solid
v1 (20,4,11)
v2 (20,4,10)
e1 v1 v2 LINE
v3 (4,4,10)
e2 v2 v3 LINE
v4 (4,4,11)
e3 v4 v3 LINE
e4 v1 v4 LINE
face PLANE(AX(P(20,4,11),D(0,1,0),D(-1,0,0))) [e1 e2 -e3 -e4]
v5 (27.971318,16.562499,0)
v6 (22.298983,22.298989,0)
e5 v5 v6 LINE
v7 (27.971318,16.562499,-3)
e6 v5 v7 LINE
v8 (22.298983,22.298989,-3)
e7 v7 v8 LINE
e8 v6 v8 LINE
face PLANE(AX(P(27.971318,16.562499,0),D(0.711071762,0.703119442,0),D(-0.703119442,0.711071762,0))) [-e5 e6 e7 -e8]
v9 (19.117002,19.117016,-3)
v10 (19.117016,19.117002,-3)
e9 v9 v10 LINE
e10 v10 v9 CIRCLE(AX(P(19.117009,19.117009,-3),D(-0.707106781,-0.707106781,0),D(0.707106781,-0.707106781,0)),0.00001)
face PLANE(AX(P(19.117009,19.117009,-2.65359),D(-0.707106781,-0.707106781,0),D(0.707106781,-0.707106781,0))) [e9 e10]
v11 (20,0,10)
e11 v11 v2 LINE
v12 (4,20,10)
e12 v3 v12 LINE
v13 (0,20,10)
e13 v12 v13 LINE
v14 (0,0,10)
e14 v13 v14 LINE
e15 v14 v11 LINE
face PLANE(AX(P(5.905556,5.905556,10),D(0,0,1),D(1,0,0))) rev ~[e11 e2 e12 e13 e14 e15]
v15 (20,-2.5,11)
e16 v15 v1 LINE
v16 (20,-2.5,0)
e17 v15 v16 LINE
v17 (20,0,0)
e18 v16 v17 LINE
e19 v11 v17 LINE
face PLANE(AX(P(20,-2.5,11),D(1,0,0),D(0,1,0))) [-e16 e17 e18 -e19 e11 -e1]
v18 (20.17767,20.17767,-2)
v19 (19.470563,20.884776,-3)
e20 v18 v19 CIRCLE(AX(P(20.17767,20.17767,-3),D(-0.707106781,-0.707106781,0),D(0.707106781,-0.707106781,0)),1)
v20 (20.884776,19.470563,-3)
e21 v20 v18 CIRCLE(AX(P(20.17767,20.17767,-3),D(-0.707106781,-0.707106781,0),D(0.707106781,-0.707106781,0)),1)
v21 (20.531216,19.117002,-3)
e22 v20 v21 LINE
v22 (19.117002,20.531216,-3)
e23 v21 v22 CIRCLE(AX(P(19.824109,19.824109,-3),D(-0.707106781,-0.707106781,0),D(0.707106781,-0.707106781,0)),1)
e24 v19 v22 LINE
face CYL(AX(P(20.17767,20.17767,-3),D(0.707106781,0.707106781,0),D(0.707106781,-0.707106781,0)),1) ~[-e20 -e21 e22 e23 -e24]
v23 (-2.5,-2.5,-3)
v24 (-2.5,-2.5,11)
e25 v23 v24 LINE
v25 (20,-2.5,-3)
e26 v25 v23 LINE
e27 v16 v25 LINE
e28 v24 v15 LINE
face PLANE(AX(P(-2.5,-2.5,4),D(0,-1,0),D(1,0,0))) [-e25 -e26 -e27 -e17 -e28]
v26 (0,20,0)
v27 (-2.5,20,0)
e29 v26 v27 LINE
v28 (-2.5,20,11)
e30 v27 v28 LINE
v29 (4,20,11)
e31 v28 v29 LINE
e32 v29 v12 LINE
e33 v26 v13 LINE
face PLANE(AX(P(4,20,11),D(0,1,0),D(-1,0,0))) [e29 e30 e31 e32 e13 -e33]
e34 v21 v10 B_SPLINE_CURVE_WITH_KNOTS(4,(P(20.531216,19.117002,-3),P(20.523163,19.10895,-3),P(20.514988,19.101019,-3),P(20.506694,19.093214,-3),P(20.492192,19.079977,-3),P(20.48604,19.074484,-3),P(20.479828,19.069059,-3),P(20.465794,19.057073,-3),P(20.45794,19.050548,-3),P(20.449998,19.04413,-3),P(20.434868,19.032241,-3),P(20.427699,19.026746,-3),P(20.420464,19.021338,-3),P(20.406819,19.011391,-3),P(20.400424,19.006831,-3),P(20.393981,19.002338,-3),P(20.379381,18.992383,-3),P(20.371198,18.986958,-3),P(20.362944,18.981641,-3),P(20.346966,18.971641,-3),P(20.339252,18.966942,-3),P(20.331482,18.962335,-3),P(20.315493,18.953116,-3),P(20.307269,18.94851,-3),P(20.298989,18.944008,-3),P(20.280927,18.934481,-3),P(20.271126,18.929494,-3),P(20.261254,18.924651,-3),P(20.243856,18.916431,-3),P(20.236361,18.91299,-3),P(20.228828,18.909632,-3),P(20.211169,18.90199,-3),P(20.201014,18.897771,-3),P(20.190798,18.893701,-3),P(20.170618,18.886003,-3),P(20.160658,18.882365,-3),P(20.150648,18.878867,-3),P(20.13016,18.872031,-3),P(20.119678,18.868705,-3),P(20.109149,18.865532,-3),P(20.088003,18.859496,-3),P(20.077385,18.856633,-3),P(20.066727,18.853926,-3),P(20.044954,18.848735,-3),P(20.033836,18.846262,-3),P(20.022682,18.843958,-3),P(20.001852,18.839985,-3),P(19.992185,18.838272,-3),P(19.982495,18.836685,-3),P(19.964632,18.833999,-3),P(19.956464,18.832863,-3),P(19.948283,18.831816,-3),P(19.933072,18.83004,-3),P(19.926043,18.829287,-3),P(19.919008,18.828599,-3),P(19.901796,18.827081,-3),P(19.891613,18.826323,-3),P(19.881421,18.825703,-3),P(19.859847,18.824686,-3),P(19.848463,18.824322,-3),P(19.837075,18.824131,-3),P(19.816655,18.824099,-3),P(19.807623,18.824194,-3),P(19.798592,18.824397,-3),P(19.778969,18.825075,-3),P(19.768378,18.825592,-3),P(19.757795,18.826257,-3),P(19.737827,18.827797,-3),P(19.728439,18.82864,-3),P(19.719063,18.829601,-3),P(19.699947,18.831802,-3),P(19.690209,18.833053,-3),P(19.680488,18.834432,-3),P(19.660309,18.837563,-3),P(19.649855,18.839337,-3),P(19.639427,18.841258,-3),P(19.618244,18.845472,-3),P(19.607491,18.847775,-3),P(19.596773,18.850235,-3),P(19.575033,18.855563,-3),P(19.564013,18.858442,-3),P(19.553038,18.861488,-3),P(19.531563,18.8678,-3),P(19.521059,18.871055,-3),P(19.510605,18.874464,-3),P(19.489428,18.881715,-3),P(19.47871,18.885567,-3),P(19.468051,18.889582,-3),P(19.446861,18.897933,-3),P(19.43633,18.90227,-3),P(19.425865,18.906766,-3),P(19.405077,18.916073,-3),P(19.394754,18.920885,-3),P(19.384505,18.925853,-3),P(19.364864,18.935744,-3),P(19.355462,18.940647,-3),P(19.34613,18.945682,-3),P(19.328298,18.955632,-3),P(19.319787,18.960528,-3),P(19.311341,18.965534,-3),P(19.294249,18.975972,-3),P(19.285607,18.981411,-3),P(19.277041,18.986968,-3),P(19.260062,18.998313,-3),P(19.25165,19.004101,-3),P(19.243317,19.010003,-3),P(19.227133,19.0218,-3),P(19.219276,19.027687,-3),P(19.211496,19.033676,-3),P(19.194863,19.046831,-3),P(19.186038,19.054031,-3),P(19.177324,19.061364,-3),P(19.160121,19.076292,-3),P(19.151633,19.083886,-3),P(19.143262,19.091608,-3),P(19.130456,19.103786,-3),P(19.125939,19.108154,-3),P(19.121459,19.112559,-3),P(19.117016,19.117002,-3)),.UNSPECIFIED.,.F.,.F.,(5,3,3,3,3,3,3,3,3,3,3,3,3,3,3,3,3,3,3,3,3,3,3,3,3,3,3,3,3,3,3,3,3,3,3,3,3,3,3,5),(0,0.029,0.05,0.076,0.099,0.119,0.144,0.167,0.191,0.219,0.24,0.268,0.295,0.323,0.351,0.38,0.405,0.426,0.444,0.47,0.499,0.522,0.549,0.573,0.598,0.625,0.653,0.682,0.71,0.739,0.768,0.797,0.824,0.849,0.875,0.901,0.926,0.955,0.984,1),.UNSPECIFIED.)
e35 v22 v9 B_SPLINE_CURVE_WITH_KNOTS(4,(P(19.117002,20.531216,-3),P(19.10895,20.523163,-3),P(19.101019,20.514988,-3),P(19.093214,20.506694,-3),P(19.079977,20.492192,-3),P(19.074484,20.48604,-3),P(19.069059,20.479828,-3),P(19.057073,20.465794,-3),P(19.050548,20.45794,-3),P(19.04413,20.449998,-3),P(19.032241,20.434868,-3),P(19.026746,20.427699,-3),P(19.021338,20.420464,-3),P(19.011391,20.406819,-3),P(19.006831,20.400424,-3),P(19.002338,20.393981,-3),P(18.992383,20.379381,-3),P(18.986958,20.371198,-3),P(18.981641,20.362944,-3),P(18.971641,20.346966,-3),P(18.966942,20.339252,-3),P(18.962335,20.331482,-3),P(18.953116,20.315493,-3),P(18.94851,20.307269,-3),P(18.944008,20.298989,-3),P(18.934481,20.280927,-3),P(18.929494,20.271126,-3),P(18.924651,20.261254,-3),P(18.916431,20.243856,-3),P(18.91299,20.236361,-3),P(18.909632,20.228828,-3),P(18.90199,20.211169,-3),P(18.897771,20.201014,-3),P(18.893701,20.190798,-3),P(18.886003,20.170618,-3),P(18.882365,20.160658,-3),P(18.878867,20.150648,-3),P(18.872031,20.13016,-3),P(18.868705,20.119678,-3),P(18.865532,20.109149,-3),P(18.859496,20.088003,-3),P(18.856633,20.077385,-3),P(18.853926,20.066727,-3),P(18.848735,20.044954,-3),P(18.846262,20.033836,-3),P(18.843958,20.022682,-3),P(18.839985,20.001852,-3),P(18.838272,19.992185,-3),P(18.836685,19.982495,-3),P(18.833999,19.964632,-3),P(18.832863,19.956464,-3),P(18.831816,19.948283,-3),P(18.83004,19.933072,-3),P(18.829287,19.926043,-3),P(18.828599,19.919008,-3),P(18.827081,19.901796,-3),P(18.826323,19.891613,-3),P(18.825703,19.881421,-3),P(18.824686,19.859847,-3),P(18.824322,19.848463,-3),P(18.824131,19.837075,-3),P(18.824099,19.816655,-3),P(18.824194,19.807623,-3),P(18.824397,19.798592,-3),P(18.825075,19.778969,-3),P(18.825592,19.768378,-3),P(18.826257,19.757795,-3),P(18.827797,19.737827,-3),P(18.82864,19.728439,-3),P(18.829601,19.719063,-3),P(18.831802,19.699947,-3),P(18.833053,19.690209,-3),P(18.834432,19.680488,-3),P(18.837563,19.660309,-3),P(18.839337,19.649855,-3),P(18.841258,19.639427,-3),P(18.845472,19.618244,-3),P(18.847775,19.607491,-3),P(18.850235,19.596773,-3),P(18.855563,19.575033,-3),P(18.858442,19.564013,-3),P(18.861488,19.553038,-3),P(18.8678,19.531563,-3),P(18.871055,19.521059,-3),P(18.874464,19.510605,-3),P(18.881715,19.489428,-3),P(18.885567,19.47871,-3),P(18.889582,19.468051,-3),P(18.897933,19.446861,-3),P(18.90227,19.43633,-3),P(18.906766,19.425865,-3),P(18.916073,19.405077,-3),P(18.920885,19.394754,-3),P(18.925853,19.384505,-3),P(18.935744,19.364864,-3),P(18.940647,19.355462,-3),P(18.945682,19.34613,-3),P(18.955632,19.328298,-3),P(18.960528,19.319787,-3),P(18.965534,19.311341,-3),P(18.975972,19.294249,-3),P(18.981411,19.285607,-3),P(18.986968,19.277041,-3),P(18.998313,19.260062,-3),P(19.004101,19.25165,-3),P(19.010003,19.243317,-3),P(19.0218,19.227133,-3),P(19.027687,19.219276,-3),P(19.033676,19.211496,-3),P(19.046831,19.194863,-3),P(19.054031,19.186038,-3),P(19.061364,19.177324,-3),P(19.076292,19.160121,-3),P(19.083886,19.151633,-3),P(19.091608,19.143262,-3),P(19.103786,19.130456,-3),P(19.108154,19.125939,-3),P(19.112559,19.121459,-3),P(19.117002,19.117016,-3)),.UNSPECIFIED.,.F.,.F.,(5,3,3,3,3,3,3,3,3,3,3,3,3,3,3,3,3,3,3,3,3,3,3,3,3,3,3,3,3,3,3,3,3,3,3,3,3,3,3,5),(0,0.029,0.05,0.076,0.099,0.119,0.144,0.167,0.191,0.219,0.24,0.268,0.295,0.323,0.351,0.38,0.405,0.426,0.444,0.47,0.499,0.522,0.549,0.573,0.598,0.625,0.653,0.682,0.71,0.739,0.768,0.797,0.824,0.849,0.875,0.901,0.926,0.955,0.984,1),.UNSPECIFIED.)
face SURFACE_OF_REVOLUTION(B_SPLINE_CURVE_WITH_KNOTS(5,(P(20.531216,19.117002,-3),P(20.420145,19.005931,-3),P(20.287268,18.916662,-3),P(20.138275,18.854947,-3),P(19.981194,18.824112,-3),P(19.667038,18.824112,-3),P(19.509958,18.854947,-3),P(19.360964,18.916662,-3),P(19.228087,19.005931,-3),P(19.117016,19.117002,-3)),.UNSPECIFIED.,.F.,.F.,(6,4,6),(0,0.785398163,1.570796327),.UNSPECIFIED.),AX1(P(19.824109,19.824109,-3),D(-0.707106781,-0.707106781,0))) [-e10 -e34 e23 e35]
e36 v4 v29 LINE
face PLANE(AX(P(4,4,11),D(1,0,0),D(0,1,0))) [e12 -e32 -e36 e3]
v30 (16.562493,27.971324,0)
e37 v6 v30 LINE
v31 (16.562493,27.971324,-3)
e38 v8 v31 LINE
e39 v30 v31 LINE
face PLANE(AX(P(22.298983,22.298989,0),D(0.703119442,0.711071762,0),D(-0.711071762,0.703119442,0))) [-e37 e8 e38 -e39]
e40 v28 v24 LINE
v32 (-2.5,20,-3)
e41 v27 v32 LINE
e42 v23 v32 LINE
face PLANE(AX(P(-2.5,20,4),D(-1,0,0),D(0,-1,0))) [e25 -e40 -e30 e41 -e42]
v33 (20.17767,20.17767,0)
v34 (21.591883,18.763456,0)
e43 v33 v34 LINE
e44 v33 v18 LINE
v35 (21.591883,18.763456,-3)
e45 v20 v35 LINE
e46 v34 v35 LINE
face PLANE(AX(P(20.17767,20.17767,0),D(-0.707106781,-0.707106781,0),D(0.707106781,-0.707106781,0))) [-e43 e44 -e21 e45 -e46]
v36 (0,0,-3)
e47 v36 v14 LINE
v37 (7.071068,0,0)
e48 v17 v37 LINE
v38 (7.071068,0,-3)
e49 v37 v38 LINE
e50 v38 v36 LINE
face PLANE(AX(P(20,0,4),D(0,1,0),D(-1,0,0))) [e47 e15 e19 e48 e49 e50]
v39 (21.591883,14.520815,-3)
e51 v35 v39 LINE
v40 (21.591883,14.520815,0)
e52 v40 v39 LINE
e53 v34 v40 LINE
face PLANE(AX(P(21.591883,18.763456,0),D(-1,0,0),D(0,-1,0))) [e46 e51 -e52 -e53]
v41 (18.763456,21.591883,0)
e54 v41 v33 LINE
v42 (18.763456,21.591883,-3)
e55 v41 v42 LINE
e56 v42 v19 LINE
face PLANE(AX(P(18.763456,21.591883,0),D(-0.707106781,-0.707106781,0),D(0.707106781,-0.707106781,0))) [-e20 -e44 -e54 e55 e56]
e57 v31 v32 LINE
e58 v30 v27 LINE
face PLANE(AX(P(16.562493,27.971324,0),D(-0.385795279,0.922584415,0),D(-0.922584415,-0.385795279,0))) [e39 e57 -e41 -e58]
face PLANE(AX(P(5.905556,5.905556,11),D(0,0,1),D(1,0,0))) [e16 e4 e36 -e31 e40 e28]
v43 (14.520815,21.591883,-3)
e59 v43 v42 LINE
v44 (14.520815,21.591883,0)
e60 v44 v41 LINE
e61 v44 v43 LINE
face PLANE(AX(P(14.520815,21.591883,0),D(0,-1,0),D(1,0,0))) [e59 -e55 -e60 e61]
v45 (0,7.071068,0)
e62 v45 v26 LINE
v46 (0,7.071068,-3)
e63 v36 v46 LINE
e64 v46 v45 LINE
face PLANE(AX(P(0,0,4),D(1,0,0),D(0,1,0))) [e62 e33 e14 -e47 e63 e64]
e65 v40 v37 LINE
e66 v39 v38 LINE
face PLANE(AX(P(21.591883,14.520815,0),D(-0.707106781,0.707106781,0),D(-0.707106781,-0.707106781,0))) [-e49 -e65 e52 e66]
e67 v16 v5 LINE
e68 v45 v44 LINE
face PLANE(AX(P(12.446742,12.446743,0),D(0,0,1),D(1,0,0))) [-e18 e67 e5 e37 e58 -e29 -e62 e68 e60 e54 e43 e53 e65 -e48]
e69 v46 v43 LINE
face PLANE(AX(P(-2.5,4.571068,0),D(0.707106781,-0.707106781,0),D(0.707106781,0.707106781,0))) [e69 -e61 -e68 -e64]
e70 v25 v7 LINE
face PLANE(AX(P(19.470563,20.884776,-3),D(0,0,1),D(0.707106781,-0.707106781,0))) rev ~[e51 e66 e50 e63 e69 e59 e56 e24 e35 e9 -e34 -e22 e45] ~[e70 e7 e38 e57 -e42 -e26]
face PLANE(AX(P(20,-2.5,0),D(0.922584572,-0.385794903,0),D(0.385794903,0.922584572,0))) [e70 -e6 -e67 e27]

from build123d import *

# Parameters (mm, degrees)
F2_DEPTH  = 7
F4_DEPTH  = 3
F5_DEPTH  = 7
F7_DEPTH  = 1.5
F8_R      = 0.99999
F10_DEPTH = 1


# Not quite as in the source:
# - a fillet or chamfer is up to 0.001 mm smaller than in the source, because OpenCascade refuses the exact size


with BuildPart() as f2:
    # F1 (on offset) → F2 (new body)
    with BuildSketch(Plane.XY.offset(4)):
        Polygon((20, 0), (0, 0), (0, 20), (-2.5, 20), (-2.5, -2.5), (20, -2.5), align=None)
    extrude(amount=F2_DEPTH)



with BuildPart() as f4:
    # F3 (on Top) → F4 (new body)
    with BuildSketch(Plane.XY):
        Polygon((21.591883092, 18.7634559673), (21.591883092, 14.5208152802), (4.5710678119, -2.5), (8.75, -2.5), (20, -2.5), (27.9713179916, 16.5624991059), (22.2989825486, 22.2989889792), (16.5624926754, 27.9713244222), (-2.5, 20), (-2.5, 8.75), (-2.5, 4.5710678119), (14.5208152802, 21.591883092), (18.7634559673, 21.591883092), (20.1776695297, 20.1776695297), align=None)
    extrude(amount=-F4_DEPTH)


with BuildPart() as f2_1:
    add(f2.part)

    add(f4.part)  # F5 merges F4
    # F1 (on offset) → F5 (join)
    with BuildSketch(Plane.XY.offset(4)):
        Polygon((20, 0), (0, 0), (0, 20), (-2.5, 20), (-2.5, -2.5), (20, -2.5), align=None)
    extrude(amount=-F5_DEPTH)

    # F6 (on face) → F7 (join)
    with BuildSketch(Plane(origin=(20.1776695297, 20.1776695297, 0), x_dir=(0.7071067812, -0.7071067812, 0), z_dir=(-0.7071067812, -0.7071067812, 0))):
        with BuildLine():
            Line((-1, -3), (1, -3))
            ThreePointArc((1, -3), (0, -2), (-1, -3))
        make_face()
    extrude(amount=F7_DEPTH)

    # F8 (radius 1 in the source; OpenCascade refuses exactly that, so slightly less here)
    f8_edges = [f2_1.edges().sort_by_distance(p)[0] for p in [
        (19.117009, 19.117009, -2),
    ]]
    fillet(f8_edges, radius=F8_R)

    # F9 (on face) → F10 (join)
    with BuildSketch(Plane.XY.offset(11)):
        Polygon((4, 20), (-2.5, 20), (-2.5, -2.5), (20, -2.5), (20, 4), (4, 4), align=None)
    extrude(amount=-F10_DEPTH)


solid = f2_1.part
